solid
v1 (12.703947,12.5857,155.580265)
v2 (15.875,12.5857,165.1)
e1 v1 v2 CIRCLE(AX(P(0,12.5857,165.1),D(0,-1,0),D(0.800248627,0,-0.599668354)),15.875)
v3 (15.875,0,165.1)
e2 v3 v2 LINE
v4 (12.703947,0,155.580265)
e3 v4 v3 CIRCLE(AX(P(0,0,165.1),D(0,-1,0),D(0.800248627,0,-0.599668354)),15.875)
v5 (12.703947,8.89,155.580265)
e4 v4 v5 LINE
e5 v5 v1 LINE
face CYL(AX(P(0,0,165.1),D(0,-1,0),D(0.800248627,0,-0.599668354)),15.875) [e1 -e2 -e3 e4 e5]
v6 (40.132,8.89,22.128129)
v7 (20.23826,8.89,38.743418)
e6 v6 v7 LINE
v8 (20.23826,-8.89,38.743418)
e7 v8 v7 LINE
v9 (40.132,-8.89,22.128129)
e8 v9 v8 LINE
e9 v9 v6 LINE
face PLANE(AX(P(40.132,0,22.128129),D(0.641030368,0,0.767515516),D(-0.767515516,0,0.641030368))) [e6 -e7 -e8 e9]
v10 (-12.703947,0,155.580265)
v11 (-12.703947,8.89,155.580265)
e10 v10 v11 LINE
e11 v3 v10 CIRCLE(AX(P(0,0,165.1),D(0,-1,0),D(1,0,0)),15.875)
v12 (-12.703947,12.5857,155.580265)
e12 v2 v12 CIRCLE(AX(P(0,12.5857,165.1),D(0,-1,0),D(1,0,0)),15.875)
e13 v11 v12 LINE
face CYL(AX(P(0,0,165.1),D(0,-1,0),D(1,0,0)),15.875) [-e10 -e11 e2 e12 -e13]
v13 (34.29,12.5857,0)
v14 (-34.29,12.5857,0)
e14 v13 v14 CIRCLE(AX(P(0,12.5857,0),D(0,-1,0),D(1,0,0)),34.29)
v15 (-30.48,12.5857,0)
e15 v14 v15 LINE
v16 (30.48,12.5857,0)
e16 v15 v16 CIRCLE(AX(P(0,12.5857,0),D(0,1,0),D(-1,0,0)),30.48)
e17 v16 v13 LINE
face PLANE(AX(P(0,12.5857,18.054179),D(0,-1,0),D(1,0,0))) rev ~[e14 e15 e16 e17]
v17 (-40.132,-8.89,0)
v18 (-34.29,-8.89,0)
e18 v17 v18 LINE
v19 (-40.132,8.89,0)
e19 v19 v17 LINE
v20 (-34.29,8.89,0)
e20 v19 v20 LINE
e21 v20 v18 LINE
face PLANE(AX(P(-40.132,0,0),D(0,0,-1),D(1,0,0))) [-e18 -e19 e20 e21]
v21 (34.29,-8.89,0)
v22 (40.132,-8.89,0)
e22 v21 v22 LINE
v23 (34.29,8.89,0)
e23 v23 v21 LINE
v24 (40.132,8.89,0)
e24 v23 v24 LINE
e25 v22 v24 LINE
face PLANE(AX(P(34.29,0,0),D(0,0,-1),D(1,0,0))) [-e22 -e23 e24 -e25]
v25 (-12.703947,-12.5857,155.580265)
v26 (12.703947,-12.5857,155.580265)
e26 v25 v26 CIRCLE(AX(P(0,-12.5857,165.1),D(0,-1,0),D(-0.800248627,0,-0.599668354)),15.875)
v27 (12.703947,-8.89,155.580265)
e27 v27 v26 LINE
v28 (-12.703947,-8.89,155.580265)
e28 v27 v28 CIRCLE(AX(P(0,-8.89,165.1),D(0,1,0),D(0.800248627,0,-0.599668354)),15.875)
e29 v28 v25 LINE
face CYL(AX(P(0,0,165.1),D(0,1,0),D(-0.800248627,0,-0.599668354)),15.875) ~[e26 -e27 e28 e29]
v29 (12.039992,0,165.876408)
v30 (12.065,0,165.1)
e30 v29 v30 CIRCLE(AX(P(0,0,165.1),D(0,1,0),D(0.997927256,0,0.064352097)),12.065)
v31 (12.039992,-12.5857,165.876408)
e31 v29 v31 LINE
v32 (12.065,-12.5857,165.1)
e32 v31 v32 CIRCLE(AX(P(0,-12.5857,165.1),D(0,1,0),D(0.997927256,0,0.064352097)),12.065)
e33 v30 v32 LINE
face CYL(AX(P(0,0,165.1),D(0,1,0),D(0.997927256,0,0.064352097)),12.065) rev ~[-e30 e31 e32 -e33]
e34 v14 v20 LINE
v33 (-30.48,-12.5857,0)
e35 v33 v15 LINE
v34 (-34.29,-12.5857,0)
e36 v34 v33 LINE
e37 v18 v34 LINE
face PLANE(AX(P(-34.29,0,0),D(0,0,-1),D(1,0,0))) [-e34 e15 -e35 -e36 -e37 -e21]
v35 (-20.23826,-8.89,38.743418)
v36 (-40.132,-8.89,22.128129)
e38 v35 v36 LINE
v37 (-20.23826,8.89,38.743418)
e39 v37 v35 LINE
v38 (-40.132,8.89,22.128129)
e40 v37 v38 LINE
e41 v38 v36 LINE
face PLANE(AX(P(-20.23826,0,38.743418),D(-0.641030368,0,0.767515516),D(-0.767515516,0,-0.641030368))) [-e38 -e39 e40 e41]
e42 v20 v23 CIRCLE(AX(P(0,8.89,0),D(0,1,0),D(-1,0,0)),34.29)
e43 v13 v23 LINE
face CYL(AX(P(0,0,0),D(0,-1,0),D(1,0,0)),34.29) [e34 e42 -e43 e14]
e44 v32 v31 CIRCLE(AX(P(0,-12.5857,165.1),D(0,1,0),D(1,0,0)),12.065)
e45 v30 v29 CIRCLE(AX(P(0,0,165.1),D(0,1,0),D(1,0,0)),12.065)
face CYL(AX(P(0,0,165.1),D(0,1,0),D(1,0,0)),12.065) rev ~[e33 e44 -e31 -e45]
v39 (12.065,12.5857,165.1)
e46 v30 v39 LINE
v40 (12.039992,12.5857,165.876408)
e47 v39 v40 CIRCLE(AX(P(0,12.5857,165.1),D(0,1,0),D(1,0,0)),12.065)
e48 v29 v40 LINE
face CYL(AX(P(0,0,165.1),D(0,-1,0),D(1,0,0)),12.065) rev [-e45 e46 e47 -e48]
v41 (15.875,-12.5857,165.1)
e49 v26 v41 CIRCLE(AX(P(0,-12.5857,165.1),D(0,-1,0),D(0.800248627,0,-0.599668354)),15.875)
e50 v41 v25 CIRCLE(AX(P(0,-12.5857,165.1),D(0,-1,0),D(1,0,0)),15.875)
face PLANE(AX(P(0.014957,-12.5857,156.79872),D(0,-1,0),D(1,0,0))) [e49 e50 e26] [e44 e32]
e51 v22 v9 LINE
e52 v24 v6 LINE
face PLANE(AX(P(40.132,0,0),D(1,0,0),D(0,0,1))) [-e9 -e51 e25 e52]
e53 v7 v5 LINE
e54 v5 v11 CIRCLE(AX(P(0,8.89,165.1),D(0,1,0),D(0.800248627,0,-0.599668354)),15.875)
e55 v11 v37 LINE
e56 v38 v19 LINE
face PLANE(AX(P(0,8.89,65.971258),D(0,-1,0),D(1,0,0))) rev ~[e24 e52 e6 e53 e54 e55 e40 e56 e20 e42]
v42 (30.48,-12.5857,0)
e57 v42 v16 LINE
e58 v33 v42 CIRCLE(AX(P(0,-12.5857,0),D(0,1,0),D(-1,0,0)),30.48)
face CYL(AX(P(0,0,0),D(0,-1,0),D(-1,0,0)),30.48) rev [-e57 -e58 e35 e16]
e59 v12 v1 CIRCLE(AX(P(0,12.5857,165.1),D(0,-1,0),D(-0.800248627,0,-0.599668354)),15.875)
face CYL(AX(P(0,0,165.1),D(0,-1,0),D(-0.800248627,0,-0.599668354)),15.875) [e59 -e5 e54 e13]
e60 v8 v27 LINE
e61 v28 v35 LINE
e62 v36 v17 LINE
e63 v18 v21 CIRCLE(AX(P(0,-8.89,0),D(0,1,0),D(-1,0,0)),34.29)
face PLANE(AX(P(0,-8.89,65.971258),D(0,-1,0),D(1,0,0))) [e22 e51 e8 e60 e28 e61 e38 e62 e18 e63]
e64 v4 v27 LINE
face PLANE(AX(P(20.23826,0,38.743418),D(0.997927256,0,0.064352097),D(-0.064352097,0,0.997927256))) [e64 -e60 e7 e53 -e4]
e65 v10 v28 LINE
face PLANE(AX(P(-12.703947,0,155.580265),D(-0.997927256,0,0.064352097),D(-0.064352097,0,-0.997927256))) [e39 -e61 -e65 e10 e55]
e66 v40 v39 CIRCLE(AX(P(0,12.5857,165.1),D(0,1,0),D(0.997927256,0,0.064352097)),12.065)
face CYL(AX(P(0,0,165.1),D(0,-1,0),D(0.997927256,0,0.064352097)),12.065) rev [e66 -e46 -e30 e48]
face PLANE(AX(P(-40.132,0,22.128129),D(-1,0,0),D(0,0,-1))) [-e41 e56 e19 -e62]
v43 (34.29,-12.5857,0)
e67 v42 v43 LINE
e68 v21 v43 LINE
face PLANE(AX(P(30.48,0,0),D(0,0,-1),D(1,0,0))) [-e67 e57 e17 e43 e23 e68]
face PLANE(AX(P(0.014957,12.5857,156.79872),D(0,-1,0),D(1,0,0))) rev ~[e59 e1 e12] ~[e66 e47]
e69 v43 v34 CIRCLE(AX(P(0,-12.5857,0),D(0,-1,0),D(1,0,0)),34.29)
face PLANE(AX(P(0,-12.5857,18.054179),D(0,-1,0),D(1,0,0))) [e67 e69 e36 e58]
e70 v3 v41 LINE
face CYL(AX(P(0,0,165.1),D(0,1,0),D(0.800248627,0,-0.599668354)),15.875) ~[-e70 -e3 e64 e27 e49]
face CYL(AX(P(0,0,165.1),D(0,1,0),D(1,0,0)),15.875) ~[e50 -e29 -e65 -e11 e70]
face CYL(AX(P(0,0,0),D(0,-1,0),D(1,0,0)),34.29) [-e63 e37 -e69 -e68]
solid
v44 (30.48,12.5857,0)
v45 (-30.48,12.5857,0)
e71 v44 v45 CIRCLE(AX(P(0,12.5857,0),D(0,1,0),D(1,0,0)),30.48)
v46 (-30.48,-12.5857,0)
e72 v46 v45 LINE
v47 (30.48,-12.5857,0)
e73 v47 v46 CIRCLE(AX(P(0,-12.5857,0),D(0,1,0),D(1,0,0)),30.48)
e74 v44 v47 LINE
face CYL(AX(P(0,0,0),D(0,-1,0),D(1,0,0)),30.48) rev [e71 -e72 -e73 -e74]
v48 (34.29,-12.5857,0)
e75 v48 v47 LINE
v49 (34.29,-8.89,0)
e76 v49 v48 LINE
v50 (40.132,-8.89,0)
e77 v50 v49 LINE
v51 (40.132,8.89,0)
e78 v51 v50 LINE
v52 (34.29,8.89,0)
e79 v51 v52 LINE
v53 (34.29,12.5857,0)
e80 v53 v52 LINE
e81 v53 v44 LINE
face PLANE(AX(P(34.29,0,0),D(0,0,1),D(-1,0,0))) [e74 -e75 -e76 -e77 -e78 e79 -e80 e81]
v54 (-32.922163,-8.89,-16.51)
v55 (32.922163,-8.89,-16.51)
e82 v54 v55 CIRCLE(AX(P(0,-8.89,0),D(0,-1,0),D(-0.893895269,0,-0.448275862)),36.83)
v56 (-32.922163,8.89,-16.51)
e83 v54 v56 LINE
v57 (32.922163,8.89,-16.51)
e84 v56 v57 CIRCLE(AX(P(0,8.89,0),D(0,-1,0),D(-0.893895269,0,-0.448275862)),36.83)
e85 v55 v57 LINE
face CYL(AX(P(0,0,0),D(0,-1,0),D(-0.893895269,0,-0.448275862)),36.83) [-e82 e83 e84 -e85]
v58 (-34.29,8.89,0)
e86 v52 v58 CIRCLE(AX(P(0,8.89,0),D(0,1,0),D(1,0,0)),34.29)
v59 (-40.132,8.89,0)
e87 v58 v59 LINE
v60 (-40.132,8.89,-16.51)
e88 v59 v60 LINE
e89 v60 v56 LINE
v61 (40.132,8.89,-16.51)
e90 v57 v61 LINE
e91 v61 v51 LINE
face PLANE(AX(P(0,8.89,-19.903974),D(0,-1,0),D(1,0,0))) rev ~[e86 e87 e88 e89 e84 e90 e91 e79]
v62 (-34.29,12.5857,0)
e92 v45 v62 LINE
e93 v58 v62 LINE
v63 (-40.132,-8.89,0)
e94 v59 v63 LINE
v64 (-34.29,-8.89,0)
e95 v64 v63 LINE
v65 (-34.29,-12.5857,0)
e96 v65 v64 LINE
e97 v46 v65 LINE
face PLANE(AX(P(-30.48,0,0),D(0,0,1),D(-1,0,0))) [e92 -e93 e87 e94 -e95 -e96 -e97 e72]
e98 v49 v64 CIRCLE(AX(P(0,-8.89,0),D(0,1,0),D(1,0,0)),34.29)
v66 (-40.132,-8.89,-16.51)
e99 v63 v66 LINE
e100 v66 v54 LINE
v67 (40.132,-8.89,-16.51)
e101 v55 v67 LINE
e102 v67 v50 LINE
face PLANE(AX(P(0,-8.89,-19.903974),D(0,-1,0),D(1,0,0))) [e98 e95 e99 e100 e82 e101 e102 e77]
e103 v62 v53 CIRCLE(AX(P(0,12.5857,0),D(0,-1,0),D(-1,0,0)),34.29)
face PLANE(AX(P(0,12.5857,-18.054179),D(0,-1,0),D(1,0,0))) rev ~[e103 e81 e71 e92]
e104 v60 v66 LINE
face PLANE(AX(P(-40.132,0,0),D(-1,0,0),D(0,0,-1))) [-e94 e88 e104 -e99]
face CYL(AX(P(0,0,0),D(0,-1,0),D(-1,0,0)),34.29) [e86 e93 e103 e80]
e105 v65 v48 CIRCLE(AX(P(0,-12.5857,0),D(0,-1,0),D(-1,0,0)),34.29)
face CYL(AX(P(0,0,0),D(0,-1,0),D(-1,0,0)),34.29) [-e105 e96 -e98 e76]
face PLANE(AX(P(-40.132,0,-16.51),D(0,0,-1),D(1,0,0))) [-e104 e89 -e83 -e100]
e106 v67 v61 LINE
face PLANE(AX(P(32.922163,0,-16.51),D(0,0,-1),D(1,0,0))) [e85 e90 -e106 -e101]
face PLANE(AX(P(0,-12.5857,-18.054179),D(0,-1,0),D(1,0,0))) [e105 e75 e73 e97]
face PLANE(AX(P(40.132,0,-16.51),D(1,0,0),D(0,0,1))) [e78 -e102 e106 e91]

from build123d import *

# Parameters (mm, degrees)
F1_DEPTH = 12.5857
F2_DEPTH = 12.5857
F3_DEPTH = 8.89
F4_DEPTH = 12.5857
F5_DEPTH = 8.89


with BuildPart() as f1:
    # F0 (on Front) → F1 (new body, symmetric)
    with BuildSketch(Plane.XZ):
        with BuildLine():
            Line((30.48, 0), (34.29, 0))
            ThreePointArc((34.29, 0), (0, 34.29), (-34.29, 0))
            Line((-34.29, 0), (-30.48, 0))
            ThreePointArc((-30.48, 0), (0, 30.48), (30.48, 0))
        make_face()
    extrude(amount=F1_DEPTH, both=True)



with BuildPart() as f2:
    # F0 (on Front) → F2 (new body, symmetric)
    with BuildSketch(Plane.XZ):
        with BuildLine():
            ThreePointArc((12.0399923395, 165.876408053), (12.0587464642, 165.4884053449), (12.065, 165.1))
            ThreePointArc((12.065, 165.1), (-0.3884053449, 153.0412535358), (-12.0399923395, 165.876408053))
            Line((-12.0399923395, 165.876408053), (-12.7039469543, 155.5802648785))
            ThreePointArc((-12.7039469543, 155.5802648785), (0, 149.225), (12.7039469543, 155.5802648785))
            Line((12.7039469543, 155.5802648785), (12.0399923395, 165.876408053))
        make_face()
        with BuildLine():
            ThreePointArc((-12.0399923395, 165.876408053), (0, 177.165), (12.0399923395, 165.876408053))
            Line((12.0399923395, 165.876408053), (12.7039469543, 155.5802648785))
            ThreePointArc((12.7039469543, 155.5802648785), (15.0613874344, 160.0830055262), (15.875, 165.1))
            ThreePointArc((15.875, 165.1), (-5.0169944738, 180.1613874344), (-12.7039469543, 155.5802648785))
            Line((-12.7039469543, 155.5802648785), (-12.0399923395, 165.876408053))
        make_face()
    extrude(amount=F2_DEPTH, both=True)


with BuildPart() as f1_1:
    add(f1.part)

    add(f2.part)  # F3 merges F2
    # F0 (on Front) → F3 (join, symmetric)
    with BuildSketch(Plane.XZ):
        with BuildLine():
            Line((20.2382598072, 38.7434177101), (12.7039469543, 155.5802648785))
            ThreePointArc((12.7039469543, 155.5802648785), (0, 149.225), (-12.7039469543, 155.5802648785))
            Line((-12.7039469543, 155.5802648785), (-20.2382598072, 38.7434177101))
            Line((-20.2382598072, 38.7434177101), (-40.132, 22.128129378))
            Line((-40.132, 22.128129378), (-40.132, 0))
            Line((-40.132, 0), (-34.29, 0))
            ThreePointArc((-34.29, 0), (0, 34.29), (34.29, 0))
            Line((34.29, 0), (40.132, 0))
            Line((40.132, 0), (40.132, 22.128129378))
            Line((40.132, 22.128129378), (20.2382598072, 38.7434177101))
        make_face()
    extrude(amount=F3_DEPTH, both=True)


with BuildPart() as f4:
    # F0 (on Front) → F4 (new body, symmetric)
    with BuildSketch(Plane.XZ):
        with BuildLine():
            ThreePointArc((-34.29, 0), (0, -34.29), (34.29, 0))
            Line((34.29, 0), (30.48, 0))
            ThreePointArc((30.48, 0), (0, -30.48), (-30.48, 0))
            Line((-30.48, 0), (-34.29, 0))
        make_face()
    extrude(amount=F4_DEPTH, both=True)

    # F0 (on Front) → F5 (join, symmetric)
    with BuildSketch(Plane.XZ):
        with BuildLine():
            Line((40.132, -16.51), (40.132, 0))
            Line((40.132, 0), (34.29, 0))
            ThreePointArc((34.29, 0), (0, -34.29), (-34.29, 0))
            Line((-34.29, 0), (-40.132, 0))
            Line((-40.132, 0), (-40.132, -16.51))
            Line((-40.132, -16.51), (-32.9221627479, -16.51))
            ThreePointArc((-32.9221627479, -16.51), (0, -36.83), (32.9221627479, -16.51))
            Line((32.9221627479, -16.51), (40.132, -16.51))
        make_face()
    extrude(amount=F5_DEPTH, both=True)


solid = Compound([f1_1.part, f4.part])
